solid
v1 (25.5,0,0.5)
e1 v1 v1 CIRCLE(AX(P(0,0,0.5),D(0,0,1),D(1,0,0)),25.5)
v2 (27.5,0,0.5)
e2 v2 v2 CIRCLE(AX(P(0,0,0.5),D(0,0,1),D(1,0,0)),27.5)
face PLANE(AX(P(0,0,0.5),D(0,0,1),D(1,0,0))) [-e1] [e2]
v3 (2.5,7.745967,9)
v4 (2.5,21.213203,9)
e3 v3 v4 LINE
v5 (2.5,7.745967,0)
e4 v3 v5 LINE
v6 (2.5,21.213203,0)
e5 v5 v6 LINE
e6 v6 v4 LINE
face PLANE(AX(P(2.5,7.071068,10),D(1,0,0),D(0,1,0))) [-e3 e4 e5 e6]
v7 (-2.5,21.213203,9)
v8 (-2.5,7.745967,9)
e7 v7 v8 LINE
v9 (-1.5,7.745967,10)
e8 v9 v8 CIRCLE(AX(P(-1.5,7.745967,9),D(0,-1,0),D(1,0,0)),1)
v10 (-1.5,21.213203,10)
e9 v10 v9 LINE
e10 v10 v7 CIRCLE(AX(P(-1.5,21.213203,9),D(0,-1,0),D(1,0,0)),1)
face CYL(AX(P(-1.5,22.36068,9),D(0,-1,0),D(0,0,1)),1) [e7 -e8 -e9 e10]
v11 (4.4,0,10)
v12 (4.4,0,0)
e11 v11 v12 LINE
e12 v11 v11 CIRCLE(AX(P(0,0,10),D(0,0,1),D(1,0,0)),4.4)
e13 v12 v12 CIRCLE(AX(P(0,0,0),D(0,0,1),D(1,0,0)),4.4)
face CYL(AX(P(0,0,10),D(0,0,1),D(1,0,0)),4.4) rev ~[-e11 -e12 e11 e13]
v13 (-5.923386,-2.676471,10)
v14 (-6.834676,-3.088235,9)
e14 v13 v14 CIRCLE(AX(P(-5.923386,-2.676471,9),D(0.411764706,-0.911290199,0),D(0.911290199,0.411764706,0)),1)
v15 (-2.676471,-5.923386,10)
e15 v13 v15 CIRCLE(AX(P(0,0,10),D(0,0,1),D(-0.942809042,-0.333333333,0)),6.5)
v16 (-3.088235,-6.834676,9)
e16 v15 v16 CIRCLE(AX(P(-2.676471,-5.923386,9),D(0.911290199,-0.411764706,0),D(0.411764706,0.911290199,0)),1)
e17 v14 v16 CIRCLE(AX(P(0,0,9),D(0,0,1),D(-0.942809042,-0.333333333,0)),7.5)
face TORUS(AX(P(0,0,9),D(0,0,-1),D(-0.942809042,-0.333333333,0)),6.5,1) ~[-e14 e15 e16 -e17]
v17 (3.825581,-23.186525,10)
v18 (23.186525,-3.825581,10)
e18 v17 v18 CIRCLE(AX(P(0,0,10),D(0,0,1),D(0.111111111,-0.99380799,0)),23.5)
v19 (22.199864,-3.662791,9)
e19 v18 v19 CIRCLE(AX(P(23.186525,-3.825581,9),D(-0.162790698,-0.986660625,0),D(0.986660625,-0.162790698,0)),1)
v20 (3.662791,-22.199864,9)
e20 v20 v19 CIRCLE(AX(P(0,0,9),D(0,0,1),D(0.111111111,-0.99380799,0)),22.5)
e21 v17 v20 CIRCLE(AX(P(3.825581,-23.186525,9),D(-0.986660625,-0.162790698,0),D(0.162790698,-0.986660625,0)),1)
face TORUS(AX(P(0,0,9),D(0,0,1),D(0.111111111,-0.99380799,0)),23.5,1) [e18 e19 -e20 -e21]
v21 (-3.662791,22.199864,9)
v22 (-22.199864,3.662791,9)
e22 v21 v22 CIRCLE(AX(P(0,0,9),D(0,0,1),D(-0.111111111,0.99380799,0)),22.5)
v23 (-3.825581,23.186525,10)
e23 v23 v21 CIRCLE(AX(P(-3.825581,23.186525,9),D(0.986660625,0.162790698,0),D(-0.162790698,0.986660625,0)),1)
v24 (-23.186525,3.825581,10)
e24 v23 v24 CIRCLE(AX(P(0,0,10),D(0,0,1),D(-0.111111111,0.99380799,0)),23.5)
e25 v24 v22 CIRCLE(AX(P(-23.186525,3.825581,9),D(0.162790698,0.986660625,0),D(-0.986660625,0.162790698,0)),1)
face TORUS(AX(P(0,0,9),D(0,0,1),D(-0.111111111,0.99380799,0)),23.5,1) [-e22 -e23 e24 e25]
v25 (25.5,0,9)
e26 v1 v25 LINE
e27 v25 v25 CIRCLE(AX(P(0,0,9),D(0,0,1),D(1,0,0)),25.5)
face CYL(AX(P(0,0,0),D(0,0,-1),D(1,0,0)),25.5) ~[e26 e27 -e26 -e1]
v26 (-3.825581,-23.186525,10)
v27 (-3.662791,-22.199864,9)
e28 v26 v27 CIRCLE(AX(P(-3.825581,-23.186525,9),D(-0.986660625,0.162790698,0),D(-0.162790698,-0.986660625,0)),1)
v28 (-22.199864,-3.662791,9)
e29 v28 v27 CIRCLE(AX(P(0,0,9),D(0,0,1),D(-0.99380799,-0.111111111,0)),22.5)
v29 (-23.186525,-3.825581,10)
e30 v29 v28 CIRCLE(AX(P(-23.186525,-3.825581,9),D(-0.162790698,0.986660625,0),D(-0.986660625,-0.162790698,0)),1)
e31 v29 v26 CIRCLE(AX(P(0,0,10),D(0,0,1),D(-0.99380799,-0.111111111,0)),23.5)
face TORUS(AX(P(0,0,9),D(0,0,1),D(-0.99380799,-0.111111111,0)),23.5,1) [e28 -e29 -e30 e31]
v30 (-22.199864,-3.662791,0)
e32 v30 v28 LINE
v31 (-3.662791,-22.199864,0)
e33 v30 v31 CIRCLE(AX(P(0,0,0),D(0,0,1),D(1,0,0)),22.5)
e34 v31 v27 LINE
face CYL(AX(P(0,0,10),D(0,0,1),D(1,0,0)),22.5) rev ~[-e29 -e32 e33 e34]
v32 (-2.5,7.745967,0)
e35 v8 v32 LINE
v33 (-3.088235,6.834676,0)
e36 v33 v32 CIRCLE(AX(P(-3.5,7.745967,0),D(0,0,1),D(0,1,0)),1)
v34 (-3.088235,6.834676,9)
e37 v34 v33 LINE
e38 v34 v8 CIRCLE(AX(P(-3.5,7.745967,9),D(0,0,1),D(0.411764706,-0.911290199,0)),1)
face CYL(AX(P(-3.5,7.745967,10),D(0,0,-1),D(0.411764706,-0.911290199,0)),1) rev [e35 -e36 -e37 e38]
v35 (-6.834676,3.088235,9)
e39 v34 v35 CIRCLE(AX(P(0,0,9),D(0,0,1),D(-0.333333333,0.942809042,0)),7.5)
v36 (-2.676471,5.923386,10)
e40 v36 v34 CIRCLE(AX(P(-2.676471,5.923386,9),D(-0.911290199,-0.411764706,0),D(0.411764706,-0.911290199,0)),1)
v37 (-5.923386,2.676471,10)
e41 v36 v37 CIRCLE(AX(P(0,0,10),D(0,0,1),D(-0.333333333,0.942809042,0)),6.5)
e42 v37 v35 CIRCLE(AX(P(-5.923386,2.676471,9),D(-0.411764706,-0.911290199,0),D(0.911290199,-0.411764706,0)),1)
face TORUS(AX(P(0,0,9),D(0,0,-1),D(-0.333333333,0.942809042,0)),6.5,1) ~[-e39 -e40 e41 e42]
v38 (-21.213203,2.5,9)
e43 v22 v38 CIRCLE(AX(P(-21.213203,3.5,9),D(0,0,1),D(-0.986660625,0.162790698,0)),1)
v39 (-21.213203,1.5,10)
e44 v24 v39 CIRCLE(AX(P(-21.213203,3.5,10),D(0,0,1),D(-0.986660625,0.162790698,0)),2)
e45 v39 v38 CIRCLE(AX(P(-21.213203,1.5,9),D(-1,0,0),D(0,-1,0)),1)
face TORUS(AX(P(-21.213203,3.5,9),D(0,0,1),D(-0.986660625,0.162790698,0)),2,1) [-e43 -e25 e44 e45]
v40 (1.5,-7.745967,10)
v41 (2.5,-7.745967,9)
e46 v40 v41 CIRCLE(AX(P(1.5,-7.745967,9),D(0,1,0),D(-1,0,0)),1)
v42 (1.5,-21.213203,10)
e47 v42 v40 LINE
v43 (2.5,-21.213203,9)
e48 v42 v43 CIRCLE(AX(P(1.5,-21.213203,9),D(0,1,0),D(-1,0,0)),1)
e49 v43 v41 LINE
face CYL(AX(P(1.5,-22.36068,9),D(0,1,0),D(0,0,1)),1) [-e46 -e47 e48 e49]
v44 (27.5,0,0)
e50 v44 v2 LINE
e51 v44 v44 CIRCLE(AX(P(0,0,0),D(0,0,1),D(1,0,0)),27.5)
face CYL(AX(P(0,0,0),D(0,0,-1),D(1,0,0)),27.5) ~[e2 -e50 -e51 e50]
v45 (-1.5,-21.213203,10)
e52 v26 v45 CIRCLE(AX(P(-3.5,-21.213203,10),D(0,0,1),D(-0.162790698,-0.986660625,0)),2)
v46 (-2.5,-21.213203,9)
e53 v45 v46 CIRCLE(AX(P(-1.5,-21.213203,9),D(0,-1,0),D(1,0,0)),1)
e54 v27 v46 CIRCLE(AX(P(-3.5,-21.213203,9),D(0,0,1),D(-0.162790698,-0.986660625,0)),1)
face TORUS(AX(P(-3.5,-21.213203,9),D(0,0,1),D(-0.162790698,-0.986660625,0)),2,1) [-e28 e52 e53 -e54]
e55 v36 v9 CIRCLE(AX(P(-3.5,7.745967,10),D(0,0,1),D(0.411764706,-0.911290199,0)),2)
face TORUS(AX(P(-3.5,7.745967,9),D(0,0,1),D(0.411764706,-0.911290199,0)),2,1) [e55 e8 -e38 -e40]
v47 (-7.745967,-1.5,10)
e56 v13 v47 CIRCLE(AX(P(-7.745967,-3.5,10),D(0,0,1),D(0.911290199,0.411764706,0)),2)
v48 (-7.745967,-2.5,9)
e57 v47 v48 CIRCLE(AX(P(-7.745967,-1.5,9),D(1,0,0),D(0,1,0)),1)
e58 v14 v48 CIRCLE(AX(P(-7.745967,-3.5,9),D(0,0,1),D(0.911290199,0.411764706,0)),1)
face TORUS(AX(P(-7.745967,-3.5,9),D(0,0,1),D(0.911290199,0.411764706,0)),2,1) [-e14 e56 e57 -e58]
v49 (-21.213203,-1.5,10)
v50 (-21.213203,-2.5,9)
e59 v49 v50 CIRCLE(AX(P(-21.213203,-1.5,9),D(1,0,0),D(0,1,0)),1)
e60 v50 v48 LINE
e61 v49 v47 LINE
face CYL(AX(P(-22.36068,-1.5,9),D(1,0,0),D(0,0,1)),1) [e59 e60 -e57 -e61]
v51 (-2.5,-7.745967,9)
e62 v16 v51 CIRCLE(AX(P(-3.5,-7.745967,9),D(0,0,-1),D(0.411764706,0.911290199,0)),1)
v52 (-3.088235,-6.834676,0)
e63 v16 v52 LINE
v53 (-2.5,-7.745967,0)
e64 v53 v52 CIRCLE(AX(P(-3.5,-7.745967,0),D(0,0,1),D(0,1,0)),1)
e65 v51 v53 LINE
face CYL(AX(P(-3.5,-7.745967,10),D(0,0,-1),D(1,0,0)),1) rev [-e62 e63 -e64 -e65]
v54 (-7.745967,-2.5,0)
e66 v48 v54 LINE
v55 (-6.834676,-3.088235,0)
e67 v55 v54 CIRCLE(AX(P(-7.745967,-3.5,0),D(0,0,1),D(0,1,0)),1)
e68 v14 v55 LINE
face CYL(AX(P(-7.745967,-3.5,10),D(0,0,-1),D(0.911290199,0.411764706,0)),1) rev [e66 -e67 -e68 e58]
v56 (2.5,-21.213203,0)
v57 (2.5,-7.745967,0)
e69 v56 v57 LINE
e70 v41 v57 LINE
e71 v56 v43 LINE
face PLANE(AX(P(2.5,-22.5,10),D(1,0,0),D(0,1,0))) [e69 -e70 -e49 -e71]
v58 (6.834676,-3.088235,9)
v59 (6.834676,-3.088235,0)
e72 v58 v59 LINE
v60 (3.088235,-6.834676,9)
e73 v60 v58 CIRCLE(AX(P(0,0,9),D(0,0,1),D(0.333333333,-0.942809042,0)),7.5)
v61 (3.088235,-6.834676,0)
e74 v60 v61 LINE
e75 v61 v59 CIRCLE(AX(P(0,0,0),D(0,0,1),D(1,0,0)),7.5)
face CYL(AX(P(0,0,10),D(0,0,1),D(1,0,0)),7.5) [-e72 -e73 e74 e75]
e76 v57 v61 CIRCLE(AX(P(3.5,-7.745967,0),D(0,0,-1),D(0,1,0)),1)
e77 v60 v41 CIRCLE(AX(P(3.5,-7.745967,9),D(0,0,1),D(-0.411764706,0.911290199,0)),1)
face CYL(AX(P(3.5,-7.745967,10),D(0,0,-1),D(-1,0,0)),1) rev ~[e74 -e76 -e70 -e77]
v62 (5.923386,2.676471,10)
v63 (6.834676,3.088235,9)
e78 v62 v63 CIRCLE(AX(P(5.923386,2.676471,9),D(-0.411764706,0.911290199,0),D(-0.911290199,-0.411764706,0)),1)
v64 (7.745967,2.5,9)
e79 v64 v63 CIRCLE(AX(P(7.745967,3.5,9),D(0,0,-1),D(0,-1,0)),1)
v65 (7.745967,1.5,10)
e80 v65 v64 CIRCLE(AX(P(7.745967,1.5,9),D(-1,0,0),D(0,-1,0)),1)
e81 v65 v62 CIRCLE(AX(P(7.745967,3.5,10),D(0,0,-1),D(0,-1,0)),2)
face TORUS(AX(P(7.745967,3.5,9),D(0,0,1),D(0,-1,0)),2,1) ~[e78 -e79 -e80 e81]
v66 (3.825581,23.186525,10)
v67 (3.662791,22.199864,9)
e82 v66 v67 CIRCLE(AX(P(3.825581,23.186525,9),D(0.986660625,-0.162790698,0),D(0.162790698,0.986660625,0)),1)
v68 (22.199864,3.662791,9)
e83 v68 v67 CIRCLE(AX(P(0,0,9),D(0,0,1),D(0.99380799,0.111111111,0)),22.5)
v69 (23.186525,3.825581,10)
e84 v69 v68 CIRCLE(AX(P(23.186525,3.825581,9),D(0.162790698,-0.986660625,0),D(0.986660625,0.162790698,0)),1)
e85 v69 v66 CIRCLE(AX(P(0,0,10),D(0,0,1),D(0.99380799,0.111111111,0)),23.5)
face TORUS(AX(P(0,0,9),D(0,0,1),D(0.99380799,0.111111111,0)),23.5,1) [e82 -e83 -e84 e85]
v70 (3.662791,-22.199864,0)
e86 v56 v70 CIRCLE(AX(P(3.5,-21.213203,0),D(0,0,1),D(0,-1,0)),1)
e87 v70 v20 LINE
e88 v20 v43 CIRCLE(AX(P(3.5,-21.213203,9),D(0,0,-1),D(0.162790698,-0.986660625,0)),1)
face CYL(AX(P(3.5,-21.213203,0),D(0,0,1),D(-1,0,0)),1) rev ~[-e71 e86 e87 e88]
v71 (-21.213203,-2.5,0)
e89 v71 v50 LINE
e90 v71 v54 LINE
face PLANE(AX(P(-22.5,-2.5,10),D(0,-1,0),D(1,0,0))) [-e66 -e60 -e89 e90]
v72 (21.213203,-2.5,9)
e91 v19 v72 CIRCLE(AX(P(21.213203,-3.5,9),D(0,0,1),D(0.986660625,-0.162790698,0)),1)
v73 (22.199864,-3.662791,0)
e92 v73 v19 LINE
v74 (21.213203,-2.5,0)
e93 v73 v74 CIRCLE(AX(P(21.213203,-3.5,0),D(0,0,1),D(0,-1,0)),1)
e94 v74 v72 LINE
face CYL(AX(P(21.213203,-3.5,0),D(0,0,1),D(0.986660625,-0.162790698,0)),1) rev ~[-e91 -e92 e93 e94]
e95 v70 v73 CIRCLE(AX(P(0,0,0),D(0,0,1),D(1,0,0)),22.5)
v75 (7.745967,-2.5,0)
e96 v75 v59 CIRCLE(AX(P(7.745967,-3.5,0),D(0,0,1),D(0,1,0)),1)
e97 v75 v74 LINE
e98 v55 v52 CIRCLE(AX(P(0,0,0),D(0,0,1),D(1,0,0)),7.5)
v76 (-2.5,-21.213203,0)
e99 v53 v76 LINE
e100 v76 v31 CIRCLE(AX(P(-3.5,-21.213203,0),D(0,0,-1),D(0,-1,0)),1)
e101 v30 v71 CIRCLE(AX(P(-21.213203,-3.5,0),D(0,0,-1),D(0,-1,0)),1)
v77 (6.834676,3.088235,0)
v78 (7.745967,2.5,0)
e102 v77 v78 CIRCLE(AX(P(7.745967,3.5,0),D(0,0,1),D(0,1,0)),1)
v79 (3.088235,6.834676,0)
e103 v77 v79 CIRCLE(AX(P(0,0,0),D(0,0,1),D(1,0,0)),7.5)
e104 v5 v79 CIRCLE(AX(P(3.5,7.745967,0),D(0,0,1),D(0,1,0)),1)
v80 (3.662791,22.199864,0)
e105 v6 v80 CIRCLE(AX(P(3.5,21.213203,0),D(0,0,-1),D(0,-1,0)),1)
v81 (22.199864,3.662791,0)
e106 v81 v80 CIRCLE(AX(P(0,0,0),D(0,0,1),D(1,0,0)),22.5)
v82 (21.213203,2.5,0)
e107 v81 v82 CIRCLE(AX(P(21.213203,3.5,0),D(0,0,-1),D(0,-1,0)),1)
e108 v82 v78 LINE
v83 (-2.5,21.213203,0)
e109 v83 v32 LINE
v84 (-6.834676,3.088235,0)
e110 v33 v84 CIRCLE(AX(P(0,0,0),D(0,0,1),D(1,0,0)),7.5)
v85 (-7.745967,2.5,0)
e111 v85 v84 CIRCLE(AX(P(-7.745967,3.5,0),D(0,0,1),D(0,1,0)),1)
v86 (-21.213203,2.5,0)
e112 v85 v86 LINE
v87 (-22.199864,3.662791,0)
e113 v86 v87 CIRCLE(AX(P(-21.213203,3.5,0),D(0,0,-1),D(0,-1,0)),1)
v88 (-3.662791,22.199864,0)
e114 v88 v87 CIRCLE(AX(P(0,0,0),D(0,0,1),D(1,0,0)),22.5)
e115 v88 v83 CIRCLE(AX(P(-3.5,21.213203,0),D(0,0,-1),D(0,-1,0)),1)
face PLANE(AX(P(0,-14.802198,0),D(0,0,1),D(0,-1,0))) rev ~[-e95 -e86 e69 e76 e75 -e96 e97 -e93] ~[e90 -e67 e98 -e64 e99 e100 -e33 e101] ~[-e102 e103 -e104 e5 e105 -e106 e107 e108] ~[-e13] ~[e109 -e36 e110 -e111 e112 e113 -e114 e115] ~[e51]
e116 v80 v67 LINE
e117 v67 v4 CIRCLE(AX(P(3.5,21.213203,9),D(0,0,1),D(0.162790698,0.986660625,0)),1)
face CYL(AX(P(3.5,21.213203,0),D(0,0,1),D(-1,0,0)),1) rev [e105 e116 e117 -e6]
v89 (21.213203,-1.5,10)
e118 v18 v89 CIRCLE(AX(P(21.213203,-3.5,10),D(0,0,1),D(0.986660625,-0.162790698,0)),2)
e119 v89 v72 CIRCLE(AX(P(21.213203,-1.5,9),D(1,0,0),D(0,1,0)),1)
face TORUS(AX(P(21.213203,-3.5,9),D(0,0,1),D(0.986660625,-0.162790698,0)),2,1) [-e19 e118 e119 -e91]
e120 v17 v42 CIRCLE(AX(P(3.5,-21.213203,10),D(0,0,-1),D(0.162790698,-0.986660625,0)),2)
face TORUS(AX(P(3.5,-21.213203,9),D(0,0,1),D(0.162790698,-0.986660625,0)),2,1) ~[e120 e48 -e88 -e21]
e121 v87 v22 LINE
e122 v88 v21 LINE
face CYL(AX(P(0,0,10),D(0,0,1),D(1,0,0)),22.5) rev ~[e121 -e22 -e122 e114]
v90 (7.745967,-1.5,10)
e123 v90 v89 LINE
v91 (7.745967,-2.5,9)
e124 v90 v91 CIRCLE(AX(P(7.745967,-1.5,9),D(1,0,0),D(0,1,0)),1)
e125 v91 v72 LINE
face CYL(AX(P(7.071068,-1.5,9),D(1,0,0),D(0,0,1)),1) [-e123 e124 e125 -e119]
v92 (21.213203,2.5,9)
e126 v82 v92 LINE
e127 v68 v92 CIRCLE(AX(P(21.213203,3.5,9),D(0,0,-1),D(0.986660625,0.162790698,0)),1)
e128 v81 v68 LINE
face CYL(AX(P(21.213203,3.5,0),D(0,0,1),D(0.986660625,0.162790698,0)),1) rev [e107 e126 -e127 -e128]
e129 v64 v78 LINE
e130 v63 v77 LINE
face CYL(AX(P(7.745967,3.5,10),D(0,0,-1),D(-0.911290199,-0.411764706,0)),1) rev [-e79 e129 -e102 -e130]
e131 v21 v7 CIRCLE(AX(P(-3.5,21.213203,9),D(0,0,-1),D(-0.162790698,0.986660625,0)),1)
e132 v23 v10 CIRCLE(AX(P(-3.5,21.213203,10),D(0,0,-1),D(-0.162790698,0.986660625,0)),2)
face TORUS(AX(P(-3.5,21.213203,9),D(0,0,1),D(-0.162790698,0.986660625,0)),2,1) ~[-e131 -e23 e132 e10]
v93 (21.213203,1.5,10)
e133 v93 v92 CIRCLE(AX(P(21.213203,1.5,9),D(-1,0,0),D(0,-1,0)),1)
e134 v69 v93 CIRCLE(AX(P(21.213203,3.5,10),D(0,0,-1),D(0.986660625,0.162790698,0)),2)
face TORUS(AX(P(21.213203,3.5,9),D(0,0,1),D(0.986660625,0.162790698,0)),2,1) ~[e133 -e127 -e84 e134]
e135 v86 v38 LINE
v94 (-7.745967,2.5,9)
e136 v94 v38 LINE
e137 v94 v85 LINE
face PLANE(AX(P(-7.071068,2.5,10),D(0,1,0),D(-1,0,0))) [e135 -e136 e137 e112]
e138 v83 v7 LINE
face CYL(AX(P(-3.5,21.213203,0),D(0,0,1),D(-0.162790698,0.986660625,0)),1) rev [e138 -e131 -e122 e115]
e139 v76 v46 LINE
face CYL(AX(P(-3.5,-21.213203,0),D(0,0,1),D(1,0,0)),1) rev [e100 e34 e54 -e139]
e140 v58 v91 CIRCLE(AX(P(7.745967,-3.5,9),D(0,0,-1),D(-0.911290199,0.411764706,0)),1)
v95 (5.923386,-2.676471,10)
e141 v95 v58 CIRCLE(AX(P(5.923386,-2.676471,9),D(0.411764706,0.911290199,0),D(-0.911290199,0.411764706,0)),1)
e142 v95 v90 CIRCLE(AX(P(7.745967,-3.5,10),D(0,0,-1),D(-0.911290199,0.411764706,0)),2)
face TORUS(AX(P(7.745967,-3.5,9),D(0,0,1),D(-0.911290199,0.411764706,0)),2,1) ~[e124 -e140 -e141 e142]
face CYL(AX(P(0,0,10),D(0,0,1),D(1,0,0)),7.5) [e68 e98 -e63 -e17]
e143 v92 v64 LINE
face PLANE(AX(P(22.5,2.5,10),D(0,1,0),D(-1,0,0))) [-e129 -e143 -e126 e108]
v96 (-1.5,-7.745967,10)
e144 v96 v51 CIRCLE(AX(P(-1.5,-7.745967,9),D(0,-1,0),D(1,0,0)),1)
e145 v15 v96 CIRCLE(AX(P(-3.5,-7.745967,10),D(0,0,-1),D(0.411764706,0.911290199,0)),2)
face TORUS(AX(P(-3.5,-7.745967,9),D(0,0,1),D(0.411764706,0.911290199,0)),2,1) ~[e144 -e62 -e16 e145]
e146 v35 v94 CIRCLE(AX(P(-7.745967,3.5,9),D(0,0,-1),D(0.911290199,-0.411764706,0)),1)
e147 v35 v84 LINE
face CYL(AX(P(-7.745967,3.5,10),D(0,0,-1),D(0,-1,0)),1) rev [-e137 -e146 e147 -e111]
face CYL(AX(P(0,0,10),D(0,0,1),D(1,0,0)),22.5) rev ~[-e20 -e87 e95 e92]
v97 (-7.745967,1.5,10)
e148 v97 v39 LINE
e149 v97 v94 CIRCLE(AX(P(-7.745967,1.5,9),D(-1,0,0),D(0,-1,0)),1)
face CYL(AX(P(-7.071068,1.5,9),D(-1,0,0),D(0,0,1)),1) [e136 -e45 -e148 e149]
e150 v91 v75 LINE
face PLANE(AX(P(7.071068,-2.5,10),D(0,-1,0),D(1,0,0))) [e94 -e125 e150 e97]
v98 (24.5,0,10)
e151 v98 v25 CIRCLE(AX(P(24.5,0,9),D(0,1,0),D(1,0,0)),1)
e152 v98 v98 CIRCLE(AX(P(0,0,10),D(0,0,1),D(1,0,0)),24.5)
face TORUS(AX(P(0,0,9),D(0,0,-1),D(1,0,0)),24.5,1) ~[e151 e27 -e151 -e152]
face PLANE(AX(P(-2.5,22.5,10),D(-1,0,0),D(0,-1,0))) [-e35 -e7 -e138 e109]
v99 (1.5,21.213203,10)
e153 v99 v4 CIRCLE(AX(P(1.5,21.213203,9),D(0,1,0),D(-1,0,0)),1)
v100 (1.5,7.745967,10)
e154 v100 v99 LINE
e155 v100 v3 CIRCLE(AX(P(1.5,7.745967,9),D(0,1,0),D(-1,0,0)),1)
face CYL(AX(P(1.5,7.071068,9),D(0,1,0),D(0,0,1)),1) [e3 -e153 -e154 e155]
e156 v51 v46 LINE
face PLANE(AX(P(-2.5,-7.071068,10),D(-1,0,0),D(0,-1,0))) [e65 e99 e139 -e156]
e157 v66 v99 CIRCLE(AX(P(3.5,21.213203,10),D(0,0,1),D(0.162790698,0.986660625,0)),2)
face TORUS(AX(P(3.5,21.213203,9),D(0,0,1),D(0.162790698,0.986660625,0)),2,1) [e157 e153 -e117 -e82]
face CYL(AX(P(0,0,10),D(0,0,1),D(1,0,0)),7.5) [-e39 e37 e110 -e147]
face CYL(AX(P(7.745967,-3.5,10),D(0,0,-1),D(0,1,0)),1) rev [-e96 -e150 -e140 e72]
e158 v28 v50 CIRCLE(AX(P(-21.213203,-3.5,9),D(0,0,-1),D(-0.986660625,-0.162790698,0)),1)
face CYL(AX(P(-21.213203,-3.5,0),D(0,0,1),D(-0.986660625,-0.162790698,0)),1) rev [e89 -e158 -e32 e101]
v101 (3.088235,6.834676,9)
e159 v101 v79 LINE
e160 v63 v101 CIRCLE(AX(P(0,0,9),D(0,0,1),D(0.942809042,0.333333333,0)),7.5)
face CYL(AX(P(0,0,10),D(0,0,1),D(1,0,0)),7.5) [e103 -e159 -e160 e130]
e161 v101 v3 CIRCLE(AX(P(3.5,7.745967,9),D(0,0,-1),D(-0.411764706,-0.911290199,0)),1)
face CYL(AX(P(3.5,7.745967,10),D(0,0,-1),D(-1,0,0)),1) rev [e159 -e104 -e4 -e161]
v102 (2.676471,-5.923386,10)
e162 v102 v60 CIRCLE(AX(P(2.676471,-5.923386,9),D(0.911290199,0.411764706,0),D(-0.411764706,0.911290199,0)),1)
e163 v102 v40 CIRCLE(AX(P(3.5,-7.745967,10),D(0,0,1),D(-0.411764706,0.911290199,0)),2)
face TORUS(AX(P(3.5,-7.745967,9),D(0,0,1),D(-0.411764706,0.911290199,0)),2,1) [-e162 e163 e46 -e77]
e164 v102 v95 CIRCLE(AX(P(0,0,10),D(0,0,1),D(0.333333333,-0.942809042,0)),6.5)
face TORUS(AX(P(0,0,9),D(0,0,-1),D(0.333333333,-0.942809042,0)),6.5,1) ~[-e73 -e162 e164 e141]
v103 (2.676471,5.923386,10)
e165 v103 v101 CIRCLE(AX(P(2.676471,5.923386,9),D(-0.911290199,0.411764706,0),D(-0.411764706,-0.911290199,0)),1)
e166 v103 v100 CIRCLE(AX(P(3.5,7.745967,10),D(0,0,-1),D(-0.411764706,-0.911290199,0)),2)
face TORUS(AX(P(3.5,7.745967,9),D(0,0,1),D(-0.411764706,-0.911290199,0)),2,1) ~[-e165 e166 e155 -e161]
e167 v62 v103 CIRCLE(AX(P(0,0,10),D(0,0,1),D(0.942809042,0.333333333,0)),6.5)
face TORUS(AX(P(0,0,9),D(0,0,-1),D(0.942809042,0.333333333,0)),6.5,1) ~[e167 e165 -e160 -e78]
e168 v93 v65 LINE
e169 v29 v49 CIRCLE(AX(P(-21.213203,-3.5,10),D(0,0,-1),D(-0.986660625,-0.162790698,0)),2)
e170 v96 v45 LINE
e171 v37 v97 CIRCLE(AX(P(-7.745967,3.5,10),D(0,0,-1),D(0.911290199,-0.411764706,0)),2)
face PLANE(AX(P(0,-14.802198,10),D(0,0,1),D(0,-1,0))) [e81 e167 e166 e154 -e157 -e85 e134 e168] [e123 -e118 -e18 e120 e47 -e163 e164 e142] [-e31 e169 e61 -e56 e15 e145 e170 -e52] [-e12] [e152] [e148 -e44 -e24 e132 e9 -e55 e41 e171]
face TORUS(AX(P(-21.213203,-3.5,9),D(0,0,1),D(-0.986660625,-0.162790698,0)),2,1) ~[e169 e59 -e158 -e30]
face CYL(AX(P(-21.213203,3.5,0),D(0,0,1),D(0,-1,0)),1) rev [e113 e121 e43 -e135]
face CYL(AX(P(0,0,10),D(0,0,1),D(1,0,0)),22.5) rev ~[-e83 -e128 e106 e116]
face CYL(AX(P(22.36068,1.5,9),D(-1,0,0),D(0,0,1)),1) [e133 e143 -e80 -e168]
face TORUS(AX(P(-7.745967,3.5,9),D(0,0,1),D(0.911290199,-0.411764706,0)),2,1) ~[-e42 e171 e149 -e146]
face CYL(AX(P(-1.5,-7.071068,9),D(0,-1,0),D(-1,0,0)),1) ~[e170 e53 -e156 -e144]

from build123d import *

# Parameters (mm, degrees)
F0_R            = 25.5
F1_DEPTH        = 10
F0_R_2          = 27.5
F2_DEPTH        = 0.5
F3_R            = 22.5
F3_R_2          = 7.5
F4_DEPTH        = 10.001
F6_DEPTH        = 10
F6_COPIES_COUNT = 4
F7_R            = 1
F8_R            = 4.4
F9_DEPTH        = 10.001


# Not quite as in the source:
# - a pattern or mirror of a feature is missing from the dataset's text; its kind, count and spacing are read off the source's solid


with BuildPart() as f1:
    # F0 (on Top) → F1 (new body)
    with BuildSketch(Plane.XY):
        Circle(F0_R)
    extrude(amount=F1_DEPTH)

    # F0 (on Top) → F2 (join)
    with BuildSketch(Plane.XY):
        Circle(F0_R_2)
        Circle(F0_R, mode=Mode.SUBTRACT)
    extrude(amount=F2_DEPTH)

    # F3 (on face) → F4 (cut, through all)
    with BuildSketch(Plane.XY.offset(10)):
        Circle(F3_R)
        Circle(F3_R_2, mode=Mode.SUBTRACT)
    extrude(amount=-F4_DEPTH, mode=Mode.SUBTRACT)

    # F5 (on face) → F6 (join, through all)
    with BuildSketch(Plane.XY.offset(10)):
        with BuildLine():
            Line((7.0710678119, -2.5), (22.5, -2.5))
            Line((22.5, -2.5), (22.5, 2.5))
            Line((22.5, 2.5), (7.0710678119, 2.5))
            ThreePointArc((7.0710678119, 2.5), (7.3919891974, 1.2682648404), (7.5, 0))
            ThreePointArc((7.5, 0), (7.3919891974, -1.2682648404), (7.0710678119, -2.5))
        make_face()
    f6 = extrude(amount=-F6_DEPTH)

    # F6_copies: F6 ×4 about axis
    f6_copies_axis = Axis((0, 0, 0), (0, 0, 1))
    for i in range(1, F6_COPIES_COUNT):
        add(f6.rotate(f6_copies_axis, i * 360 / F6_COPIES_COUNT))

    # F7
    f7_edges = [f1.edges().sort_by_distance(p)[0] for p in [
        (-15.909903, -15.909903, 10),
        (15.909903, -15.909903, 10),
        (-15.909903, 15.909903, 10),
        (15.909903, 15.909903, 10),
        (14.715874, 2.5, 10),
        (-5.303301, -5.303301, 10),
        (5.303301, -5.303301, 10),
        (-5.303301, 5.303301, 10),
        (5.303301, 5.303301, 10),
        (14.715874, -2.5, 10),
        (-25.5, 0, 10),
        (-14.715874, -2.5, 10),
        (-2.5, -14.715874, 10),
        (2.5, -14.715874, 10),
        (-2.5, 14.715874, 10),
        (-14.715874, 2.5, 10),
        (2.5, 14.715874, 10),
        (-2.5, -22.36068, 5),
        (-22.36068, -2.5, 5),
        (22.36068, -2.5, 5),
        (2.5, -22.36068, 5),
        (7.071068, -2.5, 5),
        (2.5, -7.071068, 5),
        (-2.5, -7.071068, 5),
        (-7.071068, -2.5, 5),
        (-22.36068, 2.5, 5),
        (-2.5, 22.36068, 5),
        (-2.5, 7.071068, 5),
        (-7.071068, 2.5, 5),
        (2.5, 22.36068, 5),
        (22.36068, 2.5, 5),
        (7.071068, 2.5, 5),
        (2.5, 7.071068, 5),
    ]]
    fillet(f7_edges, radius=F7_R)

    # F8 (on face) → F9 (cut, through all)
    with BuildSketch(Plane.XY.offset(10)):
        Circle(F8_R)
    extrude(amount=-F9_DEPTH, mode=Mode.SUBTRACT)


solid = f1.part
